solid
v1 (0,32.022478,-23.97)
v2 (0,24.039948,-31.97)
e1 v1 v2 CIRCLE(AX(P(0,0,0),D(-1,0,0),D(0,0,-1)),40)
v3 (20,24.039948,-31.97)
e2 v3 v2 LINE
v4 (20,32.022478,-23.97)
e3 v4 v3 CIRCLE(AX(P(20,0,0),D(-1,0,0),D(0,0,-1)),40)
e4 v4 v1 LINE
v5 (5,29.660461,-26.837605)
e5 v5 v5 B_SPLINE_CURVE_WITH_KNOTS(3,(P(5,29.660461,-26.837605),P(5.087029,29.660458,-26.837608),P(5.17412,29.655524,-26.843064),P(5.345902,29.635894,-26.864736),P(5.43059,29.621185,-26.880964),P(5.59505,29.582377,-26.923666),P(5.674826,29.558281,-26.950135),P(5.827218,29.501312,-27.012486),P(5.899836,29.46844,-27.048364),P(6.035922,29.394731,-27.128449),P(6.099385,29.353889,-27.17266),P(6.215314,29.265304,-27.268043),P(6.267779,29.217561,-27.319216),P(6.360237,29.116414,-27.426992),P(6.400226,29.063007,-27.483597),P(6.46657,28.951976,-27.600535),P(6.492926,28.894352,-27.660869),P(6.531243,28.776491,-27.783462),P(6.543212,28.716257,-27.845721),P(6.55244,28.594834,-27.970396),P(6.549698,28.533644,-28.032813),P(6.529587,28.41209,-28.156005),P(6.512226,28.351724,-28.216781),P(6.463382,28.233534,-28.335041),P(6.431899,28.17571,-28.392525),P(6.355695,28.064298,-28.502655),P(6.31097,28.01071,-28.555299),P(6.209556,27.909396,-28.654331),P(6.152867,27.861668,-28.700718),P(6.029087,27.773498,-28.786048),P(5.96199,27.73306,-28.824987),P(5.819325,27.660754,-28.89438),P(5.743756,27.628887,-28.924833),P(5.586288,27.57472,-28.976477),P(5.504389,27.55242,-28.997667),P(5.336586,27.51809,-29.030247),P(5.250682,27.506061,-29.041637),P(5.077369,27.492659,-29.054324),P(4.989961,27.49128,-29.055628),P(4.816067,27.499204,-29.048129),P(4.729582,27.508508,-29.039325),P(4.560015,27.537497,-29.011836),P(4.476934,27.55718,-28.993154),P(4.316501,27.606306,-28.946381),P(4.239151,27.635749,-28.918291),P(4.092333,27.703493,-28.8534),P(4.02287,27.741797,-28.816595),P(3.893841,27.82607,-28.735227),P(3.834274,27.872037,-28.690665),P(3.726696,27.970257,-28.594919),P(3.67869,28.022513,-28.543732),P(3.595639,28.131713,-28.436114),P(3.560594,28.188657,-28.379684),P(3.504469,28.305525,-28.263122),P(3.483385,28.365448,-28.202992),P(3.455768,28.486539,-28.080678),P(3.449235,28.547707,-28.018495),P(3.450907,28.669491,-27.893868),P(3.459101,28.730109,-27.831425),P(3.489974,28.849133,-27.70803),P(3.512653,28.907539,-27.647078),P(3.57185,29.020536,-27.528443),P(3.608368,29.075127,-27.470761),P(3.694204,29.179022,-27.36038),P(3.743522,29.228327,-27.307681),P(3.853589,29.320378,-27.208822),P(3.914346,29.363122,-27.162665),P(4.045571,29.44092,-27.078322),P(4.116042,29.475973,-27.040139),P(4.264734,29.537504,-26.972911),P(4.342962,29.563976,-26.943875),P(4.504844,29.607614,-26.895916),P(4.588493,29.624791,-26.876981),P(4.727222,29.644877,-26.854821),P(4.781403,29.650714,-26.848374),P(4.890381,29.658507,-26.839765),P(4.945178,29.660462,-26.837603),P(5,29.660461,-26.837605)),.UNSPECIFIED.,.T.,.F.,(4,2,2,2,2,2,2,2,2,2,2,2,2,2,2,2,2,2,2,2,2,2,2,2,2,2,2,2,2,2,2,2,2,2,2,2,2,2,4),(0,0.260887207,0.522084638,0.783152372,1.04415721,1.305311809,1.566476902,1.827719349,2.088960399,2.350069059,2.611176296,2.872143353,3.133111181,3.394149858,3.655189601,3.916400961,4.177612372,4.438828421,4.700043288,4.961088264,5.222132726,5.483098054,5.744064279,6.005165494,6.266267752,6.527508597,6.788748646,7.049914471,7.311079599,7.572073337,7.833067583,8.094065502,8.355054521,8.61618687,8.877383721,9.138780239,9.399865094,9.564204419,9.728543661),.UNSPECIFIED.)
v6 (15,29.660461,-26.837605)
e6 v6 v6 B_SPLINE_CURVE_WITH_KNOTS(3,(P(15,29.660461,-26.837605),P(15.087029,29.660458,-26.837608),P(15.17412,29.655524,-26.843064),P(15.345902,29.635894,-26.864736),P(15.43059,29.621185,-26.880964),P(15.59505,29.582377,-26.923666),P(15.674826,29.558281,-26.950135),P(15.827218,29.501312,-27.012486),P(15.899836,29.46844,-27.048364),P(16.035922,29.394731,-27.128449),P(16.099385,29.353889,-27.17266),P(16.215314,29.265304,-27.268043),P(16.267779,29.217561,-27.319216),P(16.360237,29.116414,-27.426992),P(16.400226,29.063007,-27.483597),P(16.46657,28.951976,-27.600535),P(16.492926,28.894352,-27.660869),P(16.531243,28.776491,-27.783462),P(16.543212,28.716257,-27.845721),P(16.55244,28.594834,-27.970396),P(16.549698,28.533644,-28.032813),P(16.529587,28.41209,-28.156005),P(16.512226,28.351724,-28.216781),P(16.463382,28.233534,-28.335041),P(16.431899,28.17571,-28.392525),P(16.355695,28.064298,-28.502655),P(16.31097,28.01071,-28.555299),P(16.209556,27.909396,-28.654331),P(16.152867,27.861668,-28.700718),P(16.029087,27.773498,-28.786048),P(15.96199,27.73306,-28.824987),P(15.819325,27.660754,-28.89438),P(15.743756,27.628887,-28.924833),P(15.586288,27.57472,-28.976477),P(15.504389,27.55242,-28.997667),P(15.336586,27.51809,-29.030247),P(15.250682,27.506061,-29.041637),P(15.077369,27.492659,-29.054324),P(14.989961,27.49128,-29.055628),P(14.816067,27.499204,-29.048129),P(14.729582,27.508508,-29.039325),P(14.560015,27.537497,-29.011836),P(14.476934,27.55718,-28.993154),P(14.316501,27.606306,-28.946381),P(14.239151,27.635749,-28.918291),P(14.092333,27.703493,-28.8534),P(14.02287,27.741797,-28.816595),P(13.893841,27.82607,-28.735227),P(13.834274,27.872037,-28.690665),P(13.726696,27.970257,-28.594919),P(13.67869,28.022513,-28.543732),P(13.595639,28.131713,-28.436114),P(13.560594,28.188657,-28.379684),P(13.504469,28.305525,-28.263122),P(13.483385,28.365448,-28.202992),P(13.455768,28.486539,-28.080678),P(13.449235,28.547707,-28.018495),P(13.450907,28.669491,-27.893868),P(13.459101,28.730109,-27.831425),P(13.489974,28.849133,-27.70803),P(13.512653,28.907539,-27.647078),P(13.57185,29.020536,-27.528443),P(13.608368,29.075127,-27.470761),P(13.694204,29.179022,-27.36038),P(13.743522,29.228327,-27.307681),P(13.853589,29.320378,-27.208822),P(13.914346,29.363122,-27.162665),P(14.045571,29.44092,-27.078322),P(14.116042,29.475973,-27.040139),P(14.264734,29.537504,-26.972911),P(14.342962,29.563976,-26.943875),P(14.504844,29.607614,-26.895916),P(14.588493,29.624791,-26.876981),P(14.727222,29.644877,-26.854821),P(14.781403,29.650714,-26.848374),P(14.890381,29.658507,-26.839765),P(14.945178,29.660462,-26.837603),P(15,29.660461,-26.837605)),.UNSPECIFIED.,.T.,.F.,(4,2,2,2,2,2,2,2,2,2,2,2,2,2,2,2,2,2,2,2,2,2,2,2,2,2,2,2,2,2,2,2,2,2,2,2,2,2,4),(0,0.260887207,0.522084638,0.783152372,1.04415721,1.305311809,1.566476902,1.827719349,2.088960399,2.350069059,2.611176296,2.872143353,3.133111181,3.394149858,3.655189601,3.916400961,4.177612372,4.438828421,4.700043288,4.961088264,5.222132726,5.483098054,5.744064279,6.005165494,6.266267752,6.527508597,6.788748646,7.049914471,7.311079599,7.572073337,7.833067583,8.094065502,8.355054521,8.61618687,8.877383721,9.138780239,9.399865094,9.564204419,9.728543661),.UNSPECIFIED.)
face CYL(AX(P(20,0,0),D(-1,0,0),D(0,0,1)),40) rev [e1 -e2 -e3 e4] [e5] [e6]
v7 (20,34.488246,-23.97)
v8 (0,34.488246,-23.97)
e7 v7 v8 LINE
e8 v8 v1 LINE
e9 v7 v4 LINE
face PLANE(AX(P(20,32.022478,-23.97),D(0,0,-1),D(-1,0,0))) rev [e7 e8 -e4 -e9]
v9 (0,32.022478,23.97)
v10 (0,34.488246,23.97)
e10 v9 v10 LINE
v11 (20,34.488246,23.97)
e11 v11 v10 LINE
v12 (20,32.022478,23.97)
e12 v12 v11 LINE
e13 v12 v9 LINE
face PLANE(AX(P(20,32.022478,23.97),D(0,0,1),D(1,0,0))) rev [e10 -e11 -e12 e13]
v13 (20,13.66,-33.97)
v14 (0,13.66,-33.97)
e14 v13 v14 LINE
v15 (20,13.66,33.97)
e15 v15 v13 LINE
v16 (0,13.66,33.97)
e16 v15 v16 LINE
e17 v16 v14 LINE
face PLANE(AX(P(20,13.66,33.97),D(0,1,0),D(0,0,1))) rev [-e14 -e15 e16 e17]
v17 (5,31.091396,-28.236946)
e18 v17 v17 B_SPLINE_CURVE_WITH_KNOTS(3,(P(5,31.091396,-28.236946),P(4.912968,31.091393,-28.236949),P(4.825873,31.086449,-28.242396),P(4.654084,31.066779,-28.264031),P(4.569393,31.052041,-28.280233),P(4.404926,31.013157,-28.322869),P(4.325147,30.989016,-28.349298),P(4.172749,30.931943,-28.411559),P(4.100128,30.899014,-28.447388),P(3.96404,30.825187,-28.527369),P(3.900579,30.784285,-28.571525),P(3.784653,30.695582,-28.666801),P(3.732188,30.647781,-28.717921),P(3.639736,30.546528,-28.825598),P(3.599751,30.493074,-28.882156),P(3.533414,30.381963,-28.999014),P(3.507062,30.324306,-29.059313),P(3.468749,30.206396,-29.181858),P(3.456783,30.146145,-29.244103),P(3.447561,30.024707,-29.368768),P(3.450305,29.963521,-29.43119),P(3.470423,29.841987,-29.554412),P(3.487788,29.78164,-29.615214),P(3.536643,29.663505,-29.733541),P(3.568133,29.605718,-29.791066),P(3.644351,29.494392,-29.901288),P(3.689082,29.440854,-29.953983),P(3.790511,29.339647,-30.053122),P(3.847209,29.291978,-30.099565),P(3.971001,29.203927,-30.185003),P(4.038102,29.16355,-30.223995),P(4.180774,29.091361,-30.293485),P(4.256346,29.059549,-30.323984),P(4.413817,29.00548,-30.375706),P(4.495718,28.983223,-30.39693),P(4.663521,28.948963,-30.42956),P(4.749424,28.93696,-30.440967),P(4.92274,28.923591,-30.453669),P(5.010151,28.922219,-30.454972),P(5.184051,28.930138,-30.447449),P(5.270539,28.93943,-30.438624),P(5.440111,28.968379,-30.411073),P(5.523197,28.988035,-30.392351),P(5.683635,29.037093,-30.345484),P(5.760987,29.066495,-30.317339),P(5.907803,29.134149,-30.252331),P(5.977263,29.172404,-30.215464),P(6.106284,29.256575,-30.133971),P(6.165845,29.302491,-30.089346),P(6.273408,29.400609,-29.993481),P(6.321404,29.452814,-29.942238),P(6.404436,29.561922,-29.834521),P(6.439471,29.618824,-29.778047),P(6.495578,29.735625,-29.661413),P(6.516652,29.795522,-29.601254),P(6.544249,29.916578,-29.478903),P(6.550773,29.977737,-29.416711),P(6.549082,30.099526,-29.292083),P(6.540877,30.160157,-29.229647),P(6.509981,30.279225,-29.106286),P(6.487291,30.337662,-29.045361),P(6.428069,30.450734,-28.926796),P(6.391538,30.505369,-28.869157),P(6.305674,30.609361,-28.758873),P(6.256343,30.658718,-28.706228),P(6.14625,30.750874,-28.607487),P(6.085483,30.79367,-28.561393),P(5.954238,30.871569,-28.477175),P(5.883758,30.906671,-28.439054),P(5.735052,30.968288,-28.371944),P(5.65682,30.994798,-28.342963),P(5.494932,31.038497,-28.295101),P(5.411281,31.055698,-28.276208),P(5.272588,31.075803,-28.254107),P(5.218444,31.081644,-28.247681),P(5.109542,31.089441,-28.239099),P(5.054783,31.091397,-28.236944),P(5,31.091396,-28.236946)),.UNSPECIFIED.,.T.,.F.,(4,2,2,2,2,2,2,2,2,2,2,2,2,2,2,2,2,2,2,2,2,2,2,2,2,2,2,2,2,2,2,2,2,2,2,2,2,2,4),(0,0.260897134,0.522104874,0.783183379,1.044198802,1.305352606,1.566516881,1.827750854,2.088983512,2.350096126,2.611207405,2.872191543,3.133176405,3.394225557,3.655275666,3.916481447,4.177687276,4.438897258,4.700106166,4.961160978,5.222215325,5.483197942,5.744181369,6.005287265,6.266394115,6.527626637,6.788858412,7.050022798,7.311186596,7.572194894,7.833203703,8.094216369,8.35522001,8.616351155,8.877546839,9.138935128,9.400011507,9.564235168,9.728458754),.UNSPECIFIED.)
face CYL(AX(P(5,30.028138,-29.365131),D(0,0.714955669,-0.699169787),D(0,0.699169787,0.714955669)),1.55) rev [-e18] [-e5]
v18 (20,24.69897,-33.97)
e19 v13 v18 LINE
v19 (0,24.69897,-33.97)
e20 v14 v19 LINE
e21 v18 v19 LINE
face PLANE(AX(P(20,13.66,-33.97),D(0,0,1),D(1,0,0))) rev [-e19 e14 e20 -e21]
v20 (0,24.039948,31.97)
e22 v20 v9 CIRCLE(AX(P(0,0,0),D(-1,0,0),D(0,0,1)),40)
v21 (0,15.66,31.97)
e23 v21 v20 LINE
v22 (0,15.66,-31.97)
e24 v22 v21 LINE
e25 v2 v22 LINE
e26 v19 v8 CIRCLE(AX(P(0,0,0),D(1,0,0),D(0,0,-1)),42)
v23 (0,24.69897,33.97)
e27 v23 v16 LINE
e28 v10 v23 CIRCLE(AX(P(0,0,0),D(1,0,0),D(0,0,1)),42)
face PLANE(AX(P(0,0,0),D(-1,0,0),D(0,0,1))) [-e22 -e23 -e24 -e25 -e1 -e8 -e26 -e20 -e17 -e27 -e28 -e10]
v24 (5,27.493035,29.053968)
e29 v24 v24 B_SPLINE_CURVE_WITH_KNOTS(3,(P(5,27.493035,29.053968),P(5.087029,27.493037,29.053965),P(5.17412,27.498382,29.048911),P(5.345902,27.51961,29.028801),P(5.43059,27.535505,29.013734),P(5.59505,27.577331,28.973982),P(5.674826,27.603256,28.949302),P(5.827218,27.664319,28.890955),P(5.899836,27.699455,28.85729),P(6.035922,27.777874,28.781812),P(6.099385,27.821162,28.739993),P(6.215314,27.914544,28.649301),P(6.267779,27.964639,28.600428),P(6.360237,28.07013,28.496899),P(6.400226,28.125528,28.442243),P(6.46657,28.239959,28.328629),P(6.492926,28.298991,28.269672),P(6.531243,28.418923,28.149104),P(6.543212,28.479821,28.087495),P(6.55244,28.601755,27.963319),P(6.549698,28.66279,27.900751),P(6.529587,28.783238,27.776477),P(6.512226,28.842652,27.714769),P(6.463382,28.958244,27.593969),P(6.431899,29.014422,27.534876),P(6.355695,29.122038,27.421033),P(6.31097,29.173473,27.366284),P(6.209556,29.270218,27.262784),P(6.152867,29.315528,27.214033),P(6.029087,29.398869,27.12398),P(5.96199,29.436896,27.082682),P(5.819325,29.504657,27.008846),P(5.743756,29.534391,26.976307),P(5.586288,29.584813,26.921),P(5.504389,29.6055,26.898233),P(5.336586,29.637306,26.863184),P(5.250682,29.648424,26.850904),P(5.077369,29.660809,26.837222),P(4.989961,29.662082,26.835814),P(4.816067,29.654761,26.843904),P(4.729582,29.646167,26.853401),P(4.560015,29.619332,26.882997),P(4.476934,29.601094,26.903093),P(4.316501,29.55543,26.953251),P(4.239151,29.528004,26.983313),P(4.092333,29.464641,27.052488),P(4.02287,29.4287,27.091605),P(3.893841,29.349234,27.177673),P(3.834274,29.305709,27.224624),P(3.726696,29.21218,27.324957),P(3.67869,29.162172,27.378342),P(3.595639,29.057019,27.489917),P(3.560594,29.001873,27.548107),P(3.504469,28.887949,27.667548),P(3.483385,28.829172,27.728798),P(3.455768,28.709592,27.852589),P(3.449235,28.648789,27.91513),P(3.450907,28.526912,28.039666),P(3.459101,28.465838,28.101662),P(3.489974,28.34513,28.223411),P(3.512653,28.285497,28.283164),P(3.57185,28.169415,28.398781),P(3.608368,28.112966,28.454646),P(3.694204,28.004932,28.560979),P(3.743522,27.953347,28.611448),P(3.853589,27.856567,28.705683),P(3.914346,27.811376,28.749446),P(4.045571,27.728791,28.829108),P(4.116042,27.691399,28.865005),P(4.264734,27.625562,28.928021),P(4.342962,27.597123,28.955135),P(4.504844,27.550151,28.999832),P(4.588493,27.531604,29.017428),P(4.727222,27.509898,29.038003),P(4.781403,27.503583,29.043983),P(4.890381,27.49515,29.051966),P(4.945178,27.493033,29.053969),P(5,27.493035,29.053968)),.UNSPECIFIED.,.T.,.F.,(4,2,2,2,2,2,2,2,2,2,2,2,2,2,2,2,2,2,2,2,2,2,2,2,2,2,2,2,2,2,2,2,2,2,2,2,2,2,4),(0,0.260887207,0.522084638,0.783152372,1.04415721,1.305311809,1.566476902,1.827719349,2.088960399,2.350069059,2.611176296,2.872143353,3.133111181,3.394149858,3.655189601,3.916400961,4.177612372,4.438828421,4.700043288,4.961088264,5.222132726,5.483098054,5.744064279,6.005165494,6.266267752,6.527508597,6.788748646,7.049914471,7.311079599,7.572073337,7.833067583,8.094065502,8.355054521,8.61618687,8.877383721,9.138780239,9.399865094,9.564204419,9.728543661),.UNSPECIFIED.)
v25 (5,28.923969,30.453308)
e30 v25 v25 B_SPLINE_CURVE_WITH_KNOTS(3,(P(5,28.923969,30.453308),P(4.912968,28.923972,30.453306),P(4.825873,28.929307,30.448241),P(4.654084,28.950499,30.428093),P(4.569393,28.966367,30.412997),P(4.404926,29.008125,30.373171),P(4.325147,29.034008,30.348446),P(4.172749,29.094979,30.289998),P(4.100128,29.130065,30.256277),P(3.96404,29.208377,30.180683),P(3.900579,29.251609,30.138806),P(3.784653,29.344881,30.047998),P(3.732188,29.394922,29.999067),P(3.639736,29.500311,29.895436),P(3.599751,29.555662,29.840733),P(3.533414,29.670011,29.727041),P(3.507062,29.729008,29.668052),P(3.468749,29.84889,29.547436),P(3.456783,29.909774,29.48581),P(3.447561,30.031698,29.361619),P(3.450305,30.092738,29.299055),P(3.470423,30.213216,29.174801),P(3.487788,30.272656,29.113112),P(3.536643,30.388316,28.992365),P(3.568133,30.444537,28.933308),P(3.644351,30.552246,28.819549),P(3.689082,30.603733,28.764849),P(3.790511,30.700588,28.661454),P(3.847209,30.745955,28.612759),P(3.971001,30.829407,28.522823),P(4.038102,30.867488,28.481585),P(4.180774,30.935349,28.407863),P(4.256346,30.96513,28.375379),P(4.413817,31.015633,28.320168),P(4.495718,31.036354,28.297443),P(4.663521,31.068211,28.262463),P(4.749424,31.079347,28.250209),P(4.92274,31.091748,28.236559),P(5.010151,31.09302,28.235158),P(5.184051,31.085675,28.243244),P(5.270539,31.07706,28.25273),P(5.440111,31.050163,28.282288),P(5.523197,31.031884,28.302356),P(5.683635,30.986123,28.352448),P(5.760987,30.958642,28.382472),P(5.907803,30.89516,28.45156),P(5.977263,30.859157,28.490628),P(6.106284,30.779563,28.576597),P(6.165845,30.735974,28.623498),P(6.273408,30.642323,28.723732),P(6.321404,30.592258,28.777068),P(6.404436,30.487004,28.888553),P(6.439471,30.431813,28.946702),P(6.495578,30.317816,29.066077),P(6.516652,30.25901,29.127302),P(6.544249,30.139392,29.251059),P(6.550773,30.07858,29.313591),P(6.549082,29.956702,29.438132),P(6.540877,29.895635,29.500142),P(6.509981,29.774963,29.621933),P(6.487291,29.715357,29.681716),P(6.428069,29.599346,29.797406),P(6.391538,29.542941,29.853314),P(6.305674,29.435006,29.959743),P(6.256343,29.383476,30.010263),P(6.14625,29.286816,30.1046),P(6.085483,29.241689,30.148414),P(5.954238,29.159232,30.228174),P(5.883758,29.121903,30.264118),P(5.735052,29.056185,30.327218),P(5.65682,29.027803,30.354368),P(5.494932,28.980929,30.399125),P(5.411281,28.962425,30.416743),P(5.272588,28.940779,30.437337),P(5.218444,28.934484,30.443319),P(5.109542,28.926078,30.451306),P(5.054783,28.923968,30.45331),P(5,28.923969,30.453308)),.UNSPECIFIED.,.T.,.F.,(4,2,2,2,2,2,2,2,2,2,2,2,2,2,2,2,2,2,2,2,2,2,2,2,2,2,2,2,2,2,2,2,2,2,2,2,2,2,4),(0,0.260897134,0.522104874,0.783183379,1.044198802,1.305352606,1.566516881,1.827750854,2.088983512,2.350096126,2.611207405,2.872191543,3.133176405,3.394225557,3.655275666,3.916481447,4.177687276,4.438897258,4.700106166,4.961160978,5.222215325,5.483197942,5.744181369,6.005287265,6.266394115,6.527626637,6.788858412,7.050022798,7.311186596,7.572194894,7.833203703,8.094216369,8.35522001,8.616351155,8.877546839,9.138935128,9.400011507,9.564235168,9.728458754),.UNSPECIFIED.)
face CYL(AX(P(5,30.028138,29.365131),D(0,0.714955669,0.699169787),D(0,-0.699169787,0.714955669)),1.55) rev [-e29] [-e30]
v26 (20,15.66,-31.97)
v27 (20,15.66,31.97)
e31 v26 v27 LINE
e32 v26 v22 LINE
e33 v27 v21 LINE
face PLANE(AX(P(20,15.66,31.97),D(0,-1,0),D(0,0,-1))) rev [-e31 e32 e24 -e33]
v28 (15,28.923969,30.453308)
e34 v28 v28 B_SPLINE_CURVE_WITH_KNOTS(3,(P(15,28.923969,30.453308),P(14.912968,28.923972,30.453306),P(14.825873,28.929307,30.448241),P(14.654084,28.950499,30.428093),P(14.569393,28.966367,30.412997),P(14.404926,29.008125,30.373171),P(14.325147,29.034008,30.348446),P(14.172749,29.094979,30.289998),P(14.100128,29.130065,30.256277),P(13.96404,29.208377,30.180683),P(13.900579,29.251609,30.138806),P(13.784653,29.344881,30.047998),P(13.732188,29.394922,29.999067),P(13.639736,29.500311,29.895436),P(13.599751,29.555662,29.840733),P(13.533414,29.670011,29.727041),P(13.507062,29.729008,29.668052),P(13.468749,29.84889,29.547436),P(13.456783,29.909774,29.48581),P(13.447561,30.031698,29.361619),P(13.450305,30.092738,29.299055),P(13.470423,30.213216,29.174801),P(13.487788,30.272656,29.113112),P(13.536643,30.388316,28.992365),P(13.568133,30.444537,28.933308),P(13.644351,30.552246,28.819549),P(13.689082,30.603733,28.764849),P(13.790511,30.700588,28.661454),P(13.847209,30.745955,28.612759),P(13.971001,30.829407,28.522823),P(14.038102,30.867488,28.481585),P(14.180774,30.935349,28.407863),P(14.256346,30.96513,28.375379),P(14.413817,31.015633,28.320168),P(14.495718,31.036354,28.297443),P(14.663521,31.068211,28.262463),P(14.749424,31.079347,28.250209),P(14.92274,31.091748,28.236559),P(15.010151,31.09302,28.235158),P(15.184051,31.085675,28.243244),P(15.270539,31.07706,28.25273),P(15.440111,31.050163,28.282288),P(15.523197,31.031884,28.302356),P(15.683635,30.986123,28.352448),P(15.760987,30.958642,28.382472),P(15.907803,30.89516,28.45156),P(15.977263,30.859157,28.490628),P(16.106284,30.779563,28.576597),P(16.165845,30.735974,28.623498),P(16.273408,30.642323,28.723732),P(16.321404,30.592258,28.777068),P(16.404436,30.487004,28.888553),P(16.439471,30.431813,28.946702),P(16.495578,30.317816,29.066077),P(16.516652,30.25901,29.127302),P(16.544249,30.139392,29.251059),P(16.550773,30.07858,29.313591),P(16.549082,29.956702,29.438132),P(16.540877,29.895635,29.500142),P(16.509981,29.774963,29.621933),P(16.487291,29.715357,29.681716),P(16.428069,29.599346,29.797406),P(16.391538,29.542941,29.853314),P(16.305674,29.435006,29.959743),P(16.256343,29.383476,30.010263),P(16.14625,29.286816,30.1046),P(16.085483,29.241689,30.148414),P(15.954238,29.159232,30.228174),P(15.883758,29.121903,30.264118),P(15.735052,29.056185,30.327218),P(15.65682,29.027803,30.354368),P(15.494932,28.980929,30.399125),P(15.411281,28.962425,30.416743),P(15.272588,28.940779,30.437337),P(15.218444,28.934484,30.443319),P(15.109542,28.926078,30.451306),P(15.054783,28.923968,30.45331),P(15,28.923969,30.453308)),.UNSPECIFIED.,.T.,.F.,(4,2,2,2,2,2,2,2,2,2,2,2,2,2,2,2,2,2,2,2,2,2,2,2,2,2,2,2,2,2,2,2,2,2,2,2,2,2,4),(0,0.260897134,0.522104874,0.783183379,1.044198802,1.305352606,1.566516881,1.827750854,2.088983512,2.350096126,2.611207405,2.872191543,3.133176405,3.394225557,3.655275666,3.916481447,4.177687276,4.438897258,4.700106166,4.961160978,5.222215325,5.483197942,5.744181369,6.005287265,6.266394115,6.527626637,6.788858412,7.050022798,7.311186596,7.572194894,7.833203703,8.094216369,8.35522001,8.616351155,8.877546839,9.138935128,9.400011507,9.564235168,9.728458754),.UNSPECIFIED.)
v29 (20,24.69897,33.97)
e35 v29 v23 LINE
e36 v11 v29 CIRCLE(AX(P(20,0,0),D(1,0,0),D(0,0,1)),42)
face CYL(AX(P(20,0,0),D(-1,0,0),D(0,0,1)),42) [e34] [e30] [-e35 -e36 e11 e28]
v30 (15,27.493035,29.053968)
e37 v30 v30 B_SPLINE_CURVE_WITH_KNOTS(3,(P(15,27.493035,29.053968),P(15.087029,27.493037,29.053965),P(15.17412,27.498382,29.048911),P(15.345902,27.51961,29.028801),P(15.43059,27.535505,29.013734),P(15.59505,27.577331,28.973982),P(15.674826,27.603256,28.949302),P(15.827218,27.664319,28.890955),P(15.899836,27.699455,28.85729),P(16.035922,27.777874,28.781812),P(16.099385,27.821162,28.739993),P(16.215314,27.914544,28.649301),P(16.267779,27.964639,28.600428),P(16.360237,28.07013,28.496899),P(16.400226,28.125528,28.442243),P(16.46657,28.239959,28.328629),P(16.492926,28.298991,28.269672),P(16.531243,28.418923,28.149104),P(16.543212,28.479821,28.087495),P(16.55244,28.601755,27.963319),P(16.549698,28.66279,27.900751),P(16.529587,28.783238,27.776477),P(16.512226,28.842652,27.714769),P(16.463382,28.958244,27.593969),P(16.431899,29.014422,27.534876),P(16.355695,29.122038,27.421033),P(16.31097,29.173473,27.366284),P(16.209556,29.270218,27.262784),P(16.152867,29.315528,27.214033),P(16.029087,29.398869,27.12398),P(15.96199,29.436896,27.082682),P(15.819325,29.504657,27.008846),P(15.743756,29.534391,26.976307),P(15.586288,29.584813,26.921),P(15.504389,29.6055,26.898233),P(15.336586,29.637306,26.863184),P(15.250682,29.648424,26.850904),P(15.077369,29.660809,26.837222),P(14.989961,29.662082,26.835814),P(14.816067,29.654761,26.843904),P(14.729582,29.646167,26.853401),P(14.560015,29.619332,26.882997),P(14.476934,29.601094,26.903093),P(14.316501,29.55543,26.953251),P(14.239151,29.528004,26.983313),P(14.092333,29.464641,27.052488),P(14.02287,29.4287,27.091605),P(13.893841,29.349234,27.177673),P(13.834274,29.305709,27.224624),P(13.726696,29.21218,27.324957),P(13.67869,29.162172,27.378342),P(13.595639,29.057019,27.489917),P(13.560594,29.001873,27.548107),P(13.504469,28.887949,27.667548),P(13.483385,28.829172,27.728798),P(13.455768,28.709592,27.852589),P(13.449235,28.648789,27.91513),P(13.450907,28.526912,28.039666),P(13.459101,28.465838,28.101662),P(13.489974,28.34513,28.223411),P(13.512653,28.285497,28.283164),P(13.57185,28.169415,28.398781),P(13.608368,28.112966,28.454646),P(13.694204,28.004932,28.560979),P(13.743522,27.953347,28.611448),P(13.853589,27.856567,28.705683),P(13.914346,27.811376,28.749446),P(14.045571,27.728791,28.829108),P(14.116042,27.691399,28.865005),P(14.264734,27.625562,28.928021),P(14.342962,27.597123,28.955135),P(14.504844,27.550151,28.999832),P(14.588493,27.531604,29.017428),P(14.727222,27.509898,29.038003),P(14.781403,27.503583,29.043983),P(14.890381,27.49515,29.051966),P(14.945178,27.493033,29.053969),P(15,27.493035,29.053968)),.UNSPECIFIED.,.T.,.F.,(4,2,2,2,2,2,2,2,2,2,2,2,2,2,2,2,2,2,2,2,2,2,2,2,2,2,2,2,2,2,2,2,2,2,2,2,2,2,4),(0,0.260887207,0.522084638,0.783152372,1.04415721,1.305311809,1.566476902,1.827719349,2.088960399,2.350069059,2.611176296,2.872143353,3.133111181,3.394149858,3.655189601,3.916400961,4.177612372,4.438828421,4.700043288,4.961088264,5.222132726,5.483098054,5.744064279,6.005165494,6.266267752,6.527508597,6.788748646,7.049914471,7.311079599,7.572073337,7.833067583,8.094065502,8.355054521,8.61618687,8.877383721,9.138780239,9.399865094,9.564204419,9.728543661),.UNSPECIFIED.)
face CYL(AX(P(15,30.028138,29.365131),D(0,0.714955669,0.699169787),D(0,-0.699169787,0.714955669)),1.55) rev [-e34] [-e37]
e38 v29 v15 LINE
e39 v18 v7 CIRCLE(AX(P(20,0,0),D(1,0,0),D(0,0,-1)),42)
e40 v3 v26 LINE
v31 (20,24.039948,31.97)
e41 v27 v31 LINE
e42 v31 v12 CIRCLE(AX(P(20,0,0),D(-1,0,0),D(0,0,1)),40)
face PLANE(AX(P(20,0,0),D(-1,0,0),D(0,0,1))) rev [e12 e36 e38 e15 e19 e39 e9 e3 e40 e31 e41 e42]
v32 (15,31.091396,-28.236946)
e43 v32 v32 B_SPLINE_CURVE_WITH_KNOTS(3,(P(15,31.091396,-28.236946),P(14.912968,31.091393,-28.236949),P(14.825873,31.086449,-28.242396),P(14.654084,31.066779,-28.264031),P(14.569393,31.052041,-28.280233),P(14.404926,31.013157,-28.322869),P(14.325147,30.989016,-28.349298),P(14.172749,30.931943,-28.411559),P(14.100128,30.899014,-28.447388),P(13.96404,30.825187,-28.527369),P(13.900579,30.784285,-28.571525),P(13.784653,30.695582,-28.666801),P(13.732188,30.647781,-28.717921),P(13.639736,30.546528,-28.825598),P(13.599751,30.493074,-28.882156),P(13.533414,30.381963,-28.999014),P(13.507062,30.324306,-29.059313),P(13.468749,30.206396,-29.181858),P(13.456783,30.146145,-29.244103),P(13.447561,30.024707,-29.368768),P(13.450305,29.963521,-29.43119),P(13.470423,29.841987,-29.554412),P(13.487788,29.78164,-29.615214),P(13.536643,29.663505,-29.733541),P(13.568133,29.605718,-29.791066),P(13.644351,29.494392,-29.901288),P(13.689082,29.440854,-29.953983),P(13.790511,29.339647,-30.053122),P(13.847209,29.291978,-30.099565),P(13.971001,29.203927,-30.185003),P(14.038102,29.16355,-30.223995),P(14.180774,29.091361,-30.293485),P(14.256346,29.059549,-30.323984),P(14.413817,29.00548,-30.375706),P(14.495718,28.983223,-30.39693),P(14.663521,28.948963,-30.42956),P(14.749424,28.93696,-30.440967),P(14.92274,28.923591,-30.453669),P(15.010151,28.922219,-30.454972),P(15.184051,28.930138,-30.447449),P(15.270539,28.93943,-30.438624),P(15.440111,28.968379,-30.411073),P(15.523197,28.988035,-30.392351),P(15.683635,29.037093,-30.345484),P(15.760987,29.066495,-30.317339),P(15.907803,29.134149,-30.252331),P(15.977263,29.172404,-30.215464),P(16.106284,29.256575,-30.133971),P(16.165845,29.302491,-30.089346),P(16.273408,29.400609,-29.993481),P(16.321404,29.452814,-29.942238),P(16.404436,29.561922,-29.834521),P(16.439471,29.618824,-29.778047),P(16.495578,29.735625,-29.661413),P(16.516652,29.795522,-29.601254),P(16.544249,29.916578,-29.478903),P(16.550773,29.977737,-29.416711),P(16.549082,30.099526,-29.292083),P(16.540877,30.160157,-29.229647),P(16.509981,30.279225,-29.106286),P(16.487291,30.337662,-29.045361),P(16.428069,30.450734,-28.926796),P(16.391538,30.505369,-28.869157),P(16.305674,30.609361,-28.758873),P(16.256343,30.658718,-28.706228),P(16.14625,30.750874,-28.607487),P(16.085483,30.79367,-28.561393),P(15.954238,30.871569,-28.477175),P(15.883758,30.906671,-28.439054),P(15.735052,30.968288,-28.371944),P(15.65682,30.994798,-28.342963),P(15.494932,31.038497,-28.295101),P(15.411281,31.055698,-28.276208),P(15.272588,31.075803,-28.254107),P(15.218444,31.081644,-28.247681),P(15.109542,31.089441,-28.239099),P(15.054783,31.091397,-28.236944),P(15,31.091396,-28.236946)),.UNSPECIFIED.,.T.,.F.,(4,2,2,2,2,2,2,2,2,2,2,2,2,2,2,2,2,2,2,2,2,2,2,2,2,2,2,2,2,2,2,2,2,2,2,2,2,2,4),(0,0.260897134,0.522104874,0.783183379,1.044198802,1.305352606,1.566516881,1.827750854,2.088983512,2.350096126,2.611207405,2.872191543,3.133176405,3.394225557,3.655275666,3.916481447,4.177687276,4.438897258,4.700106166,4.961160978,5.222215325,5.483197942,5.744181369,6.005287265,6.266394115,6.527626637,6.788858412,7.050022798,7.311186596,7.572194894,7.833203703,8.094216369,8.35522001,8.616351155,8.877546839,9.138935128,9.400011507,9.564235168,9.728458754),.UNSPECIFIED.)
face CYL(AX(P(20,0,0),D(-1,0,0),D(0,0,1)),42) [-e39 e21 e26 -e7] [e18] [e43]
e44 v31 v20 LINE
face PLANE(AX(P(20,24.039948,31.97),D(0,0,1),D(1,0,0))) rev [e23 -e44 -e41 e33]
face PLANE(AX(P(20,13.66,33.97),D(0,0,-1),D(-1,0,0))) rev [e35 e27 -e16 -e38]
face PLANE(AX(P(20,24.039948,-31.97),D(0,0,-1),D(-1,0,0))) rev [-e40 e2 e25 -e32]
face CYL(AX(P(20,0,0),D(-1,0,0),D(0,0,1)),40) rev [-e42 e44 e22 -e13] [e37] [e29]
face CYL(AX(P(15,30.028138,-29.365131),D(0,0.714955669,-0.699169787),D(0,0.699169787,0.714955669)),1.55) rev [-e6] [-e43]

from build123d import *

# Parameters (mm, degrees)
BOSS_EXTRU_1_DEPTH         = 20
D_GAGEMENT_START           = 39.969957368
D_GAGEMENT_M2_51_OUTLINE_R = 1.55
D_GAGEMENT_M2_51_DEPTH     = 2.030042632


# Read off the part's stored shape, not the designer's step: Dégagement M2.51
with BuildPart() as part:
    # Esquisse1 → Boss.-Extru.1 (new body)
    with BuildSketch(Plane(origin=(0, 0, 0), x_dir=(0, 0, -1), z_dir=(1, 0, 0))):
        with BuildLine():
            Line((-31.97, 24.039948003), (-31.97, 15.66))
            Line((-31.97, 15.66), (31.97, 15.66))
            Line((31.97, 15.66), (31.97, 24.039948003))
            ThreePointArc((31.97, 24.039948003), (28.253337793, 28.315170908), (23.97, 32.022478043))
            Line((23.97, 32.022478043), (23.97, 34.488245824))
            ThreePointArc((23.97, 34.488245824), (29.380578316, 30.013024137), (33.97, 24.698969614))
            Line((33.97, 24.698969614), (33.97, 13.66))
            Line((33.97, 13.66), (-33.97, 13.66))
            Line((-33.97, 13.66), (-33.97, 24.698969614))
            ThreePointArc((-33.97, 24.698969614), (-29.380578316, 30.013024137), (-23.97, 34.488245824))
            Line((-23.97, 34.488245824), (-23.97, 32.022478043))
            ThreePointArc((-23.97, 32.022478043), (-28.253337793, 28.315170908), (-31.97, 24.039948003))
        make_face()
    extrude(amount=BOSS_EXTRU_1_DEPTH)

    # Dégagement M2.51 outline → Dégagement M2.51 (cut)
    with BuildSketch(Plane(origin=(0, 0, 0), x_dir=(1, 0, 0), z_dir=(0, 0.7149556691384648, -0.6991697870809138)).offset(D_GAGEMENT_START)):
        with Locations((5, 0)):
            Circle(D_GAGEMENT_M2_51_OUTLINE_R)
        with Locations((15, 0)):
            Circle(D_GAGEMENT_M2_51_OUTLINE_R)
    d_gagement_m2_51 = extrude(amount=D_GAGEMENT_M2_51_DEPTH, mode=Mode.SUBTRACT)

    # Symétrie1: Dégagement M2.51 across plane
    add(d_gagement_m2_51.mirror(Plane.XY), mode=Mode.SUBTRACT)


solid = part.part
